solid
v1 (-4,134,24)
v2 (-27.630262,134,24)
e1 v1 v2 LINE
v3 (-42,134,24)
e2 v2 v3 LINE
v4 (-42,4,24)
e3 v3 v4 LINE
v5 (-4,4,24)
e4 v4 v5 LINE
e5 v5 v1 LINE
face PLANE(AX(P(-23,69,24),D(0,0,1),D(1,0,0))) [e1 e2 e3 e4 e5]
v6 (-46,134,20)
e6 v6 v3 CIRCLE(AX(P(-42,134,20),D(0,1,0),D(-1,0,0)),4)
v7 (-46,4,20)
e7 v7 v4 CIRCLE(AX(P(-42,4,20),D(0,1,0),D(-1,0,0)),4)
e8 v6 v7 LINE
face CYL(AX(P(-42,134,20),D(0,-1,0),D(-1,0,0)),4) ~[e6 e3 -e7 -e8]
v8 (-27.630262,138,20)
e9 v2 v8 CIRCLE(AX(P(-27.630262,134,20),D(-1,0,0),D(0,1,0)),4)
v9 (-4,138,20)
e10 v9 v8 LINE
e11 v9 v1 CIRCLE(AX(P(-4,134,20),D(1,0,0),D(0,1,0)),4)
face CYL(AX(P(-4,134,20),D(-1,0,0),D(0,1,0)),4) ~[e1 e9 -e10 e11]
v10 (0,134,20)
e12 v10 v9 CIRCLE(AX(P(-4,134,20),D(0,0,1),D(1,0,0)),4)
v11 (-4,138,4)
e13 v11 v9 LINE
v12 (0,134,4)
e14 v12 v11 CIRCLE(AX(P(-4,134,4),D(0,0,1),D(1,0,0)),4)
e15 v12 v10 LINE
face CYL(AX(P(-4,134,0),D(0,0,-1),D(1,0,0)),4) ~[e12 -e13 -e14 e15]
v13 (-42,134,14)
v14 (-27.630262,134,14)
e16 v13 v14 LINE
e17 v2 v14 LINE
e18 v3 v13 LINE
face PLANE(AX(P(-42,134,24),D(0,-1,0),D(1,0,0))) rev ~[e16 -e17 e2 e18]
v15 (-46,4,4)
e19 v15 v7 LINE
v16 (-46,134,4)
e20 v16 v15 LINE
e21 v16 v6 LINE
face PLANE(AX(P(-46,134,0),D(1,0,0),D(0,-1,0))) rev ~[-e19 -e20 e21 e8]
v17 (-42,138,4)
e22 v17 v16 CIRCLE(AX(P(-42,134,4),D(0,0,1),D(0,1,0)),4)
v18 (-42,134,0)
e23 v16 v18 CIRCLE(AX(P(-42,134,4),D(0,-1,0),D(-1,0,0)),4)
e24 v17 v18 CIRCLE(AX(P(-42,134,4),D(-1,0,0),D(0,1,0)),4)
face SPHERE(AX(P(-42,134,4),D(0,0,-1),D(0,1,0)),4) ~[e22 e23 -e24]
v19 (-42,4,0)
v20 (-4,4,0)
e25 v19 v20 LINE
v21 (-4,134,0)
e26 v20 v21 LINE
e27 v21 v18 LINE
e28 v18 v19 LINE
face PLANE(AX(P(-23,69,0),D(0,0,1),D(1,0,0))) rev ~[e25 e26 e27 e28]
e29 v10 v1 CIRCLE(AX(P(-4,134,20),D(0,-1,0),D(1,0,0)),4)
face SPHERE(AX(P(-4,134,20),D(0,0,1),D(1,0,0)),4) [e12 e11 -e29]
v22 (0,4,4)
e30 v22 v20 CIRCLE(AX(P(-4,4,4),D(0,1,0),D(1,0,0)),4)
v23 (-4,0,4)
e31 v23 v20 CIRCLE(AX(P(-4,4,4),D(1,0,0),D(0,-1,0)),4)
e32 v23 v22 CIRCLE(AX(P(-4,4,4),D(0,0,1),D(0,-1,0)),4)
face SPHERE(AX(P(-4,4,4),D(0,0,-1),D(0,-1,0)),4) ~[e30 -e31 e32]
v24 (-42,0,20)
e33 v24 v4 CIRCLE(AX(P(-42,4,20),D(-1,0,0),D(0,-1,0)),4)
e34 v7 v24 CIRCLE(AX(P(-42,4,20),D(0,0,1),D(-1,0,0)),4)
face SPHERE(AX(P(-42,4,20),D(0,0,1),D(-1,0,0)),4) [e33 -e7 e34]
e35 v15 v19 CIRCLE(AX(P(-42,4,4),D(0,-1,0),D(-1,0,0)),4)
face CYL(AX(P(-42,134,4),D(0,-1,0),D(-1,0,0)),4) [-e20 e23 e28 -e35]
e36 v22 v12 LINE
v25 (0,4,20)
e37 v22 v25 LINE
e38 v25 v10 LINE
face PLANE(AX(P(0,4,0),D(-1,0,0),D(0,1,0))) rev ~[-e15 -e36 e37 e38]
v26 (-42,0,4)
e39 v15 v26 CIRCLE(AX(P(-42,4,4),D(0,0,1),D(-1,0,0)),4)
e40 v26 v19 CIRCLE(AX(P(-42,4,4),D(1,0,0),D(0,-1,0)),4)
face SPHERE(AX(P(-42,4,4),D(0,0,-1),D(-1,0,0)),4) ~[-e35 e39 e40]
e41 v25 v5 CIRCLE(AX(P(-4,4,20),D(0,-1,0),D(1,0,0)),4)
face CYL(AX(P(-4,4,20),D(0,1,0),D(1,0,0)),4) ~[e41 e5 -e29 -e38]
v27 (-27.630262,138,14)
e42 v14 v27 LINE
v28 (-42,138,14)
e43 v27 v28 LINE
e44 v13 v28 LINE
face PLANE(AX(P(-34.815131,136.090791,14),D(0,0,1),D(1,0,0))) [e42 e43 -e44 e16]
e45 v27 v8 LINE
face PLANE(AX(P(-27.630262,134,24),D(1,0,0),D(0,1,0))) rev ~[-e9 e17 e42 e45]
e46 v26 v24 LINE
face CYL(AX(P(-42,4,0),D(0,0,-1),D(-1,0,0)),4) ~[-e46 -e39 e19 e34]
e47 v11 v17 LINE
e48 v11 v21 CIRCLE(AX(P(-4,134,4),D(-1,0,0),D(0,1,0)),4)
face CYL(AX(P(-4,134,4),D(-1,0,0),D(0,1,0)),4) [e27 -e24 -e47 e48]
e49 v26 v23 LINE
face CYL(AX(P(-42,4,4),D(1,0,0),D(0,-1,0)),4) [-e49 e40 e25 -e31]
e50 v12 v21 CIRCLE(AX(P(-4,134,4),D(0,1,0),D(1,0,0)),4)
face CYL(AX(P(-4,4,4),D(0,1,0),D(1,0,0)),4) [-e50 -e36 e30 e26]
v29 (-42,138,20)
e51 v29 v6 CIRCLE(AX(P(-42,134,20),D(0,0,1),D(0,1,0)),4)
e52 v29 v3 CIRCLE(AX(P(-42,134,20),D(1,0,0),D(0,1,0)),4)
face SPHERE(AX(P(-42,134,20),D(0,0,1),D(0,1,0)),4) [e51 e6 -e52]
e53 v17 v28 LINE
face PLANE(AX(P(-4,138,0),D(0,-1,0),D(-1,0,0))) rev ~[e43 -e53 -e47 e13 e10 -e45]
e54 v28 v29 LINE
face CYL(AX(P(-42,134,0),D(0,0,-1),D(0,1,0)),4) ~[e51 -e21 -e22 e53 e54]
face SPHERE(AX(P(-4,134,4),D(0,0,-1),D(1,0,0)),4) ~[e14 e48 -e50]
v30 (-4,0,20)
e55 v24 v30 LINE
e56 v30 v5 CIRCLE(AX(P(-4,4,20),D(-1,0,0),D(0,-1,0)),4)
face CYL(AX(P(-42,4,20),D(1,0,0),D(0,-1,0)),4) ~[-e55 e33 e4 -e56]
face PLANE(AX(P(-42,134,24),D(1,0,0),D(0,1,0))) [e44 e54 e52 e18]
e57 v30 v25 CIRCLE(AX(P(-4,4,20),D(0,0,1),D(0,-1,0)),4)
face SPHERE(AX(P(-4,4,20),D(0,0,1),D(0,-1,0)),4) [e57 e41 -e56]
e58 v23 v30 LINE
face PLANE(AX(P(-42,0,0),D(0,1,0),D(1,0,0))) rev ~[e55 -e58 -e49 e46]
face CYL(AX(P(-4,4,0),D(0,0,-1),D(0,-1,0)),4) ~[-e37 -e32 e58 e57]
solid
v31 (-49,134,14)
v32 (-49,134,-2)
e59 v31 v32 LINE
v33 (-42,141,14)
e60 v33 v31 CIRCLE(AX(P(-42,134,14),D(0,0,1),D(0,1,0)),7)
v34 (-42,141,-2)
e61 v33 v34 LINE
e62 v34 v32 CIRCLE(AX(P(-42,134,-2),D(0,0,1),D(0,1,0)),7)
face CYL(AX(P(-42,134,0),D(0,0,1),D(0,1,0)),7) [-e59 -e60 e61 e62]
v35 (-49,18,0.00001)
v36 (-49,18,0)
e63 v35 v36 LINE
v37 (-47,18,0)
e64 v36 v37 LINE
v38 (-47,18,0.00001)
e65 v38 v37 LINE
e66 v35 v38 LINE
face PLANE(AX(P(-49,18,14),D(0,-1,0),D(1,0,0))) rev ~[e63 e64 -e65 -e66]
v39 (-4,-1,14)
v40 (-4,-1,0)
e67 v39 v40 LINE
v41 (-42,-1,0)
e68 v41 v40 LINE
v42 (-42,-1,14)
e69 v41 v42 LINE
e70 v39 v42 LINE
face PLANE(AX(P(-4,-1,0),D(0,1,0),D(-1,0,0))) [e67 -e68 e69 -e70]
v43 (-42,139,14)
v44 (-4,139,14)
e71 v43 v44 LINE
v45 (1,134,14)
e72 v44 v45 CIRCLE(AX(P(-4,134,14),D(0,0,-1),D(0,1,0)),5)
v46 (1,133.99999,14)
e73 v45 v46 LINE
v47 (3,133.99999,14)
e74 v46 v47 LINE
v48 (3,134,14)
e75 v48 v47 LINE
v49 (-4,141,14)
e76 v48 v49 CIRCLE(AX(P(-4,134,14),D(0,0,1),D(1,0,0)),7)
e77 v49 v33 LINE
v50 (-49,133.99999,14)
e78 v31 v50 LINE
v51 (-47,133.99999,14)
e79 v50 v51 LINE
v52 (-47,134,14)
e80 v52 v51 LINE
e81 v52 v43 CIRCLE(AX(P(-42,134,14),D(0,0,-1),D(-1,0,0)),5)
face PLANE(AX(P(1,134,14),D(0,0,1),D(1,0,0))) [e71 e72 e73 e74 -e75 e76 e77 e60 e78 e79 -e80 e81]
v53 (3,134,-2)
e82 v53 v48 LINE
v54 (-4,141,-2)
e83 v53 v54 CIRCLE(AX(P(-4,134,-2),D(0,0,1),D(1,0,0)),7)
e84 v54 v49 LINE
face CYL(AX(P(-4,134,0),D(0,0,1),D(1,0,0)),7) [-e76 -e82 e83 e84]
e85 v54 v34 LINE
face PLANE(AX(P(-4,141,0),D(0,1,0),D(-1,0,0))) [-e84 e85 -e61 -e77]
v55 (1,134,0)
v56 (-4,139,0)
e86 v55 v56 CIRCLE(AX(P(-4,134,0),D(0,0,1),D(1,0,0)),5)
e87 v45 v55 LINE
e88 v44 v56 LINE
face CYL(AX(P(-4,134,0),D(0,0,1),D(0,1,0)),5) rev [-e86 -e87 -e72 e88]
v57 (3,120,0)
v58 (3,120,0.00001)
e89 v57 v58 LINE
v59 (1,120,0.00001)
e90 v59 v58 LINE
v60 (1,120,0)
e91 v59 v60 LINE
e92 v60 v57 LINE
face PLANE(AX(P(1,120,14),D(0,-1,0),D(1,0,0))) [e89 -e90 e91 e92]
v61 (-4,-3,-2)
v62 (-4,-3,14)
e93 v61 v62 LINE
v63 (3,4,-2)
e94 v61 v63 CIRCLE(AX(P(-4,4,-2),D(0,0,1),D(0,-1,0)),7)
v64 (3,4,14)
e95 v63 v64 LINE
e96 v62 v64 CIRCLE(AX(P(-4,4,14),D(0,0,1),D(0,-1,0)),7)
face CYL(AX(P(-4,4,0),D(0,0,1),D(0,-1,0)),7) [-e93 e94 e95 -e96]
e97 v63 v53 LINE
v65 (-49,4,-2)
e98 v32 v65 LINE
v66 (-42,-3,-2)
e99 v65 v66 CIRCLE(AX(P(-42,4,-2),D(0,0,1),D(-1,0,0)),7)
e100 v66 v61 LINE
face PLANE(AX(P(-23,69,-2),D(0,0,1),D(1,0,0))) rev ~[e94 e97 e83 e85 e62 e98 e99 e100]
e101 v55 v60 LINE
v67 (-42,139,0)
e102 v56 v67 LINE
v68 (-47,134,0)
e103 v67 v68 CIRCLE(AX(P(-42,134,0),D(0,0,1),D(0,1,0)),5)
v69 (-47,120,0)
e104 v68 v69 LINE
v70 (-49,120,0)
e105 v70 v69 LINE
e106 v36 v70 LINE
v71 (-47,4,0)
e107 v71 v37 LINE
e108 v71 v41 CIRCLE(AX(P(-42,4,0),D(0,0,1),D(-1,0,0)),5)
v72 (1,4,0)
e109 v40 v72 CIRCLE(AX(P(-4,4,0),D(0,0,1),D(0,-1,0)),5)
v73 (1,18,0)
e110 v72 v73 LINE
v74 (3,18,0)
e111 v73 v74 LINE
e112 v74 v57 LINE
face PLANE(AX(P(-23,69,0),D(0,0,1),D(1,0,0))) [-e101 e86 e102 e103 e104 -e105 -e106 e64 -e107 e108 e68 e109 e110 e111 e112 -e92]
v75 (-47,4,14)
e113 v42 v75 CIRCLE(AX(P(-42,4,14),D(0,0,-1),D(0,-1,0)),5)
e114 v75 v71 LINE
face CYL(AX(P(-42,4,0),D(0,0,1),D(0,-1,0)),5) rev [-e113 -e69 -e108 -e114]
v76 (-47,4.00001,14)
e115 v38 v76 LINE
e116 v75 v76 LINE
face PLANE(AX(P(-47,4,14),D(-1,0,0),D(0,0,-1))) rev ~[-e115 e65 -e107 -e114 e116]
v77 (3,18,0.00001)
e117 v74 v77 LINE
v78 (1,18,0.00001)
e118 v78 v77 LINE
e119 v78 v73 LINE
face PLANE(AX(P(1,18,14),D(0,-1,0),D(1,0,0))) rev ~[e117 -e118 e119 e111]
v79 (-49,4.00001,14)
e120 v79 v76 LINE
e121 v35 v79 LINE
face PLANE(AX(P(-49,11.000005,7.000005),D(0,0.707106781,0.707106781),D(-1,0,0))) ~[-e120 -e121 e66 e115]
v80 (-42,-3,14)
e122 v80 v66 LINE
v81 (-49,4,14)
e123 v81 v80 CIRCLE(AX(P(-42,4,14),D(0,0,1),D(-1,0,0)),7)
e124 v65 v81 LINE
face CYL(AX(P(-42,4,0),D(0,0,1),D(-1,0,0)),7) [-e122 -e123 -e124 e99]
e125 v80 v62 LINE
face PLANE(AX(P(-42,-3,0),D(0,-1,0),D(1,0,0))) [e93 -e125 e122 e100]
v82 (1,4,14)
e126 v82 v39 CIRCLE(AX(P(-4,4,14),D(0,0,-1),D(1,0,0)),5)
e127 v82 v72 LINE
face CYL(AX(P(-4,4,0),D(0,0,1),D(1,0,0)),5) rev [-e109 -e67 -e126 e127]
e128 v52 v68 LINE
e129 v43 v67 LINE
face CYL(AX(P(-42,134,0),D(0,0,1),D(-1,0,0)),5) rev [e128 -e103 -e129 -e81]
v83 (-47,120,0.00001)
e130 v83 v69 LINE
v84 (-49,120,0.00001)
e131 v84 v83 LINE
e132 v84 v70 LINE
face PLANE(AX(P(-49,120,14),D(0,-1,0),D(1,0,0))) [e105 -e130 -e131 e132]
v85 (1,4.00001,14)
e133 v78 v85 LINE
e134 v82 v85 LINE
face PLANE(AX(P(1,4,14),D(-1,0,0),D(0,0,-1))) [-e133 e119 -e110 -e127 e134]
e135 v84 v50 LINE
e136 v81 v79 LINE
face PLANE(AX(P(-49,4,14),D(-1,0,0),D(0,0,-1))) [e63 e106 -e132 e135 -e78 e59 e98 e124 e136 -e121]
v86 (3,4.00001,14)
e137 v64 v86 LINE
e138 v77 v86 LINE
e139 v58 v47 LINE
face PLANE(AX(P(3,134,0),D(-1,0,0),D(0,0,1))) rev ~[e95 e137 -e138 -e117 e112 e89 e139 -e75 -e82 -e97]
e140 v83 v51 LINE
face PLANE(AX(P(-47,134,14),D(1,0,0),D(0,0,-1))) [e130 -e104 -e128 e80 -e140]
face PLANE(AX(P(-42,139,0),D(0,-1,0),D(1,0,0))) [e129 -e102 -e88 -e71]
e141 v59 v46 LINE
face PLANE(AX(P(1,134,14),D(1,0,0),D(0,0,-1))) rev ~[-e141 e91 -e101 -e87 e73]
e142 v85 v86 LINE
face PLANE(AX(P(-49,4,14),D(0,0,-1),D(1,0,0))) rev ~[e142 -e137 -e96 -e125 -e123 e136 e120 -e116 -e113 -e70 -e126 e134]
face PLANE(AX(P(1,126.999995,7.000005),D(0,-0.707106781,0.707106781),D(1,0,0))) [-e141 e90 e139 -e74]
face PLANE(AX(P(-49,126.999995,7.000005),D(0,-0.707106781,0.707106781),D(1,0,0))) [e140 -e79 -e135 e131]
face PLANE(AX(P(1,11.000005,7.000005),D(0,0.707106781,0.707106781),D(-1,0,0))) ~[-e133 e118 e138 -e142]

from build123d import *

# Parameters (mm, degrees)
F1_DEPTH  = 24
F2_R      = 4
F3_W      = 14.3697379231
F3_H      = 4.1815820932
F4_DEPTH  = 10
F5_DEPTH  = 14
F6_DEPTH  = 2
F7_DEPTH  = 2
F8_W      = 2
F8_H      = 130
F9_DEPTH  = 14
F10_DEPTH = 14
F11_DEPTH = 14
F12_SIZE  = 13.99999


# Not quite as in the source:
# - a fillet or chamfer is up to 0.001 mm smaller than in the source, because OpenCascade refuses the exact size


with BuildPart() as f1:
    # F0 (on Top) → F1 (new body)
    with BuildSketch(Plane.XY):
        with BuildLine():
            Line((-42, 0), (-4, 0))
            ThreePointArc((-4, 0), (-1.1715728753, 1.1715728753), (0, 4))
            Line((0, 4), (0, 134))
            ThreePointArc((0, 134), (-1.1715728753, 136.8284271247), (-4, 138))
            Line((-4, 138), (-42, 138))
            ThreePointArc((-42, 138), (-44.8284271247, 136.8284271247), (-46, 134))
            Line((-46, 134), (-46, 4))
            ThreePointArc((-46, 4), (-44.8284271247, 1.1715728753), (-42, 0))
        make_face()
    extrude(amount=F1_DEPTH)

    # F2
    f2_edges = [f1.edges().sort_by_distance(p)[0] for p in [
        (-46, 69, 24),
        (-44.828427, 1.171573, 24),
        (-23, 0, 24),
        (-1.171573, 1.171573, 24),
        (0, 69, 24),
        (-1.171573, 136.828427, 24),
        (-23, 138, 24),
        (-44.828427, 136.828427, 24),
        (-46, 69, 0),
        (-44.828427, 1.171573, 0),
        (-23, 0, 0),
        (-1.171573, 1.171573, 0),
        (0, 69, 0),
        (-1.171573, 136.828427, 0),
        (-23, 138, 0),
        (-44.828427, 136.828427, 0),
    ]]
    fillet(f2_edges, radius=F2_R)

    # F3 (on face) → F4 (cut)
    with BuildSketch(Plane.XY.offset(24)):
        with Locations((-34.8151310384, 136.0907910466)):
            Rectangle(F3_W, F3_H)
    extrude(amount=-F4_DEPTH, mode=Mode.SUBTRACT)


with BuildPart() as f5:
    # F0 (on Top) → F5 (new body)
    with BuildSketch(Plane.XY):
        with BuildLine():
            Line((-42, -3), (-4, -3))
            ThreePointArc((-4, -3), (0.9497474683, -0.9497474683), (3, 4))
            Line((3, 4), (3, 134))
            ThreePointArc((3, 134), (0.9497474683, 138.9497474683), (-4, 141))
            Line((-4, 141), (-42, 141))
            ThreePointArc((-42, 141), (-46.9497474683, 138.9497474683), (-49, 134))
            Line((-49, 134), (-49, 4))
            ThreePointArc((-49, 4), (-46.9497474683, -0.9497474683), (-42, -3))
        make_face()
        with BuildLine():
            ThreePointArc((-42, -1), (-45.5355339059, 0.4644660941), (-47, 4))
            Line((-47, 4), (-47, 134))
            ThreePointArc((-47, 134), (-45.5355339059, 137.5355339059), (-42, 139))
            Line((-42, 139), (-4, 139))
            ThreePointArc((-4, 139), (-0.4644660941, 137.5355339059), (1, 134))
            Line((1, 134), (1, 4))
            ThreePointArc((1, 4), (-0.4644660941, 0.4644660941), (-4, -1))
            Line((-4, -1), (-42, -1))
        make_face(mode=Mode.SUBTRACT)
    extrude(amount=F5_DEPTH)



with BuildPart() as f6:
    # F0 (on Top) → F6 (new body)
    with BuildSketch(Plane.XY):
        with BuildLine():
            Line((-42, -3), (-4, -3))
            ThreePointArc((-4, -3), (0.9497474683, -0.9497474683), (3, 4))
            Line((3, 4), (3, 134))
            ThreePointArc((3, 134), (0.9497474683, 138.9497474683), (-4, 141))
            Line((-4, 141), (-42, 141))
            ThreePointArc((-42, 141), (-46.9497474683, 138.9497474683), (-49, 134))
            Line((-49, 134), (-49, 4))
            ThreePointArc((-49, 4), (-46.9497474683, -0.9497474683), (-42, -3))
        make_face()
        with BuildLine():
            ThreePointArc((-42, -1), (-45.5355339059, 0.4644660941), (-47, 4))
            Line((-47, 4), (-47, 134))
            ThreePointArc((-47, 134), (-45.5355339059, 137.5355339059), (-42, 139))
            Line((-42, 139), (-4, 139))
            ThreePointArc((-4, 139), (-0.4644660941, 137.5355339059), (1, 134))
            Line((1, 134), (1, 4))
            ThreePointArc((1, 4), (-0.4644660941, 0.4644660941), (-4, -1))
            Line((-4, -1), (-42, -1))
        make_face(mode=Mode.SUBTRACT)
    extrude(amount=-F6_DEPTH)


with BuildPart() as f6b:
    # F0 (on Top) → F6, piece 2 (new body)
    with BuildSketch(Plane.XY):
        with BuildLine():
            Line((-42, 0), (-4, 0))
            ThreePointArc((-4, 0), (-1.1715728753, 1.1715728753), (0, 4))
            Line((0, 4), (0, 134))
            ThreePointArc((0, 134), (-1.1715728753, 136.8284271247), (-4, 138))
            Line((-4, 138), (-42, 138))
            ThreePointArc((-42, 138), (-44.8284271247, 136.8284271247), (-46, 134))
            Line((-46, 134), (-46, 4))
            ThreePointArc((-46, 4), (-44.8284271247, 1.1715728753), (-42, 0))
        make_face()
    extrude(amount=-F6_DEPTH)


with BuildPart() as f5_1:
    add(f5.part)

    add(f6.part)  # F7 merges F6

    add(f6b.part)  # F7 merges F6b
    # F0 (on Top) → F7 (join)
    with BuildSketch(Plane.XY):
        with BuildLine():
            Line((-47, 134), (-47, 4))
            ThreePointArc((-47, 4), (-45.5355339059, 0.4644660941), (-42, -1))
            Line((-42, -1), (-4, -1))
            ThreePointArc((-4, -1), (-0.4644660941, 0.4644660941), (1, 4))
            Line((1, 4), (1, 134))
            ThreePointArc((1, 134), (-0.4644660941, 137.5355339059), (-4, 139))
            Line((-4, 139), (-42, 139))
            ThreePointArc((-42, 139), (-45.5355339059, 137.5355339059), (-47, 134))
        make_face()
        with BuildLine():
            ThreePointArc((0, 4), (-1.1715728753, 1.1715728753), (-4, 0))
            Line((-4, 0), (-42, 0))
            ThreePointArc((-42, 0), (-44.8284271247, 1.1715728753), (-46, 4))
            Line((-46, 4), (-46, 134))
            ThreePointArc((-46, 134), (-44.8284271247, 136.8284271247), (-42, 138))
            Line((-42, 138), (-4, 138))
            ThreePointArc((-4, 138), (-1.1715728753, 136.8284271247), (0, 134))
            Line((0, 134), (0, 4))
        make_face(mode=Mode.SUBTRACT)
    extrude(amount=-F7_DEPTH)

    # F8 (on face) → F9 (cut)
    with BuildSketch(Plane.XY.offset(14)):
        with Locations((-48, 69)):
            Rectangle(F8_W, F8_H)
        with Locations((2, 69)):
            Rectangle(F8_W, F8_H)
    extrude(amount=-F9_DEPTH, mode=Mode.SUBTRACT)

    # F10 (add): faces of the model
    f10_faces = [f5_1.faces().sort_by_distance(p)[0] for p in [
        (-48, 4, 7),
        (2, 4, 7),
    ]]
    extrude(f10_faces, amount=F10_DEPTH)

    # F11 (add): faces of the model
    f11_faces = [f5_1.faces().sort_by_distance(p)[0] for p in [
        (2, 134, 7),
        (-48, 134, 7),
    ]]
    extrude(f11_faces, amount=F11_DEPTH)

    # F12 (size 14 in the source; OpenCascade refuses exactly that, so slightly less here)
    f12_edges = [f5_1.edges().sort_by_distance(p)[0] for p in [
        (-48, 120, 14),
        (2, 120, 14),
        (2, 18, 14),
        (-48, 18, 14),
    ]]
    chamfer(f12_edges, length=F12_SIZE)


solid = Compound([f1.part, f5_1.part])
